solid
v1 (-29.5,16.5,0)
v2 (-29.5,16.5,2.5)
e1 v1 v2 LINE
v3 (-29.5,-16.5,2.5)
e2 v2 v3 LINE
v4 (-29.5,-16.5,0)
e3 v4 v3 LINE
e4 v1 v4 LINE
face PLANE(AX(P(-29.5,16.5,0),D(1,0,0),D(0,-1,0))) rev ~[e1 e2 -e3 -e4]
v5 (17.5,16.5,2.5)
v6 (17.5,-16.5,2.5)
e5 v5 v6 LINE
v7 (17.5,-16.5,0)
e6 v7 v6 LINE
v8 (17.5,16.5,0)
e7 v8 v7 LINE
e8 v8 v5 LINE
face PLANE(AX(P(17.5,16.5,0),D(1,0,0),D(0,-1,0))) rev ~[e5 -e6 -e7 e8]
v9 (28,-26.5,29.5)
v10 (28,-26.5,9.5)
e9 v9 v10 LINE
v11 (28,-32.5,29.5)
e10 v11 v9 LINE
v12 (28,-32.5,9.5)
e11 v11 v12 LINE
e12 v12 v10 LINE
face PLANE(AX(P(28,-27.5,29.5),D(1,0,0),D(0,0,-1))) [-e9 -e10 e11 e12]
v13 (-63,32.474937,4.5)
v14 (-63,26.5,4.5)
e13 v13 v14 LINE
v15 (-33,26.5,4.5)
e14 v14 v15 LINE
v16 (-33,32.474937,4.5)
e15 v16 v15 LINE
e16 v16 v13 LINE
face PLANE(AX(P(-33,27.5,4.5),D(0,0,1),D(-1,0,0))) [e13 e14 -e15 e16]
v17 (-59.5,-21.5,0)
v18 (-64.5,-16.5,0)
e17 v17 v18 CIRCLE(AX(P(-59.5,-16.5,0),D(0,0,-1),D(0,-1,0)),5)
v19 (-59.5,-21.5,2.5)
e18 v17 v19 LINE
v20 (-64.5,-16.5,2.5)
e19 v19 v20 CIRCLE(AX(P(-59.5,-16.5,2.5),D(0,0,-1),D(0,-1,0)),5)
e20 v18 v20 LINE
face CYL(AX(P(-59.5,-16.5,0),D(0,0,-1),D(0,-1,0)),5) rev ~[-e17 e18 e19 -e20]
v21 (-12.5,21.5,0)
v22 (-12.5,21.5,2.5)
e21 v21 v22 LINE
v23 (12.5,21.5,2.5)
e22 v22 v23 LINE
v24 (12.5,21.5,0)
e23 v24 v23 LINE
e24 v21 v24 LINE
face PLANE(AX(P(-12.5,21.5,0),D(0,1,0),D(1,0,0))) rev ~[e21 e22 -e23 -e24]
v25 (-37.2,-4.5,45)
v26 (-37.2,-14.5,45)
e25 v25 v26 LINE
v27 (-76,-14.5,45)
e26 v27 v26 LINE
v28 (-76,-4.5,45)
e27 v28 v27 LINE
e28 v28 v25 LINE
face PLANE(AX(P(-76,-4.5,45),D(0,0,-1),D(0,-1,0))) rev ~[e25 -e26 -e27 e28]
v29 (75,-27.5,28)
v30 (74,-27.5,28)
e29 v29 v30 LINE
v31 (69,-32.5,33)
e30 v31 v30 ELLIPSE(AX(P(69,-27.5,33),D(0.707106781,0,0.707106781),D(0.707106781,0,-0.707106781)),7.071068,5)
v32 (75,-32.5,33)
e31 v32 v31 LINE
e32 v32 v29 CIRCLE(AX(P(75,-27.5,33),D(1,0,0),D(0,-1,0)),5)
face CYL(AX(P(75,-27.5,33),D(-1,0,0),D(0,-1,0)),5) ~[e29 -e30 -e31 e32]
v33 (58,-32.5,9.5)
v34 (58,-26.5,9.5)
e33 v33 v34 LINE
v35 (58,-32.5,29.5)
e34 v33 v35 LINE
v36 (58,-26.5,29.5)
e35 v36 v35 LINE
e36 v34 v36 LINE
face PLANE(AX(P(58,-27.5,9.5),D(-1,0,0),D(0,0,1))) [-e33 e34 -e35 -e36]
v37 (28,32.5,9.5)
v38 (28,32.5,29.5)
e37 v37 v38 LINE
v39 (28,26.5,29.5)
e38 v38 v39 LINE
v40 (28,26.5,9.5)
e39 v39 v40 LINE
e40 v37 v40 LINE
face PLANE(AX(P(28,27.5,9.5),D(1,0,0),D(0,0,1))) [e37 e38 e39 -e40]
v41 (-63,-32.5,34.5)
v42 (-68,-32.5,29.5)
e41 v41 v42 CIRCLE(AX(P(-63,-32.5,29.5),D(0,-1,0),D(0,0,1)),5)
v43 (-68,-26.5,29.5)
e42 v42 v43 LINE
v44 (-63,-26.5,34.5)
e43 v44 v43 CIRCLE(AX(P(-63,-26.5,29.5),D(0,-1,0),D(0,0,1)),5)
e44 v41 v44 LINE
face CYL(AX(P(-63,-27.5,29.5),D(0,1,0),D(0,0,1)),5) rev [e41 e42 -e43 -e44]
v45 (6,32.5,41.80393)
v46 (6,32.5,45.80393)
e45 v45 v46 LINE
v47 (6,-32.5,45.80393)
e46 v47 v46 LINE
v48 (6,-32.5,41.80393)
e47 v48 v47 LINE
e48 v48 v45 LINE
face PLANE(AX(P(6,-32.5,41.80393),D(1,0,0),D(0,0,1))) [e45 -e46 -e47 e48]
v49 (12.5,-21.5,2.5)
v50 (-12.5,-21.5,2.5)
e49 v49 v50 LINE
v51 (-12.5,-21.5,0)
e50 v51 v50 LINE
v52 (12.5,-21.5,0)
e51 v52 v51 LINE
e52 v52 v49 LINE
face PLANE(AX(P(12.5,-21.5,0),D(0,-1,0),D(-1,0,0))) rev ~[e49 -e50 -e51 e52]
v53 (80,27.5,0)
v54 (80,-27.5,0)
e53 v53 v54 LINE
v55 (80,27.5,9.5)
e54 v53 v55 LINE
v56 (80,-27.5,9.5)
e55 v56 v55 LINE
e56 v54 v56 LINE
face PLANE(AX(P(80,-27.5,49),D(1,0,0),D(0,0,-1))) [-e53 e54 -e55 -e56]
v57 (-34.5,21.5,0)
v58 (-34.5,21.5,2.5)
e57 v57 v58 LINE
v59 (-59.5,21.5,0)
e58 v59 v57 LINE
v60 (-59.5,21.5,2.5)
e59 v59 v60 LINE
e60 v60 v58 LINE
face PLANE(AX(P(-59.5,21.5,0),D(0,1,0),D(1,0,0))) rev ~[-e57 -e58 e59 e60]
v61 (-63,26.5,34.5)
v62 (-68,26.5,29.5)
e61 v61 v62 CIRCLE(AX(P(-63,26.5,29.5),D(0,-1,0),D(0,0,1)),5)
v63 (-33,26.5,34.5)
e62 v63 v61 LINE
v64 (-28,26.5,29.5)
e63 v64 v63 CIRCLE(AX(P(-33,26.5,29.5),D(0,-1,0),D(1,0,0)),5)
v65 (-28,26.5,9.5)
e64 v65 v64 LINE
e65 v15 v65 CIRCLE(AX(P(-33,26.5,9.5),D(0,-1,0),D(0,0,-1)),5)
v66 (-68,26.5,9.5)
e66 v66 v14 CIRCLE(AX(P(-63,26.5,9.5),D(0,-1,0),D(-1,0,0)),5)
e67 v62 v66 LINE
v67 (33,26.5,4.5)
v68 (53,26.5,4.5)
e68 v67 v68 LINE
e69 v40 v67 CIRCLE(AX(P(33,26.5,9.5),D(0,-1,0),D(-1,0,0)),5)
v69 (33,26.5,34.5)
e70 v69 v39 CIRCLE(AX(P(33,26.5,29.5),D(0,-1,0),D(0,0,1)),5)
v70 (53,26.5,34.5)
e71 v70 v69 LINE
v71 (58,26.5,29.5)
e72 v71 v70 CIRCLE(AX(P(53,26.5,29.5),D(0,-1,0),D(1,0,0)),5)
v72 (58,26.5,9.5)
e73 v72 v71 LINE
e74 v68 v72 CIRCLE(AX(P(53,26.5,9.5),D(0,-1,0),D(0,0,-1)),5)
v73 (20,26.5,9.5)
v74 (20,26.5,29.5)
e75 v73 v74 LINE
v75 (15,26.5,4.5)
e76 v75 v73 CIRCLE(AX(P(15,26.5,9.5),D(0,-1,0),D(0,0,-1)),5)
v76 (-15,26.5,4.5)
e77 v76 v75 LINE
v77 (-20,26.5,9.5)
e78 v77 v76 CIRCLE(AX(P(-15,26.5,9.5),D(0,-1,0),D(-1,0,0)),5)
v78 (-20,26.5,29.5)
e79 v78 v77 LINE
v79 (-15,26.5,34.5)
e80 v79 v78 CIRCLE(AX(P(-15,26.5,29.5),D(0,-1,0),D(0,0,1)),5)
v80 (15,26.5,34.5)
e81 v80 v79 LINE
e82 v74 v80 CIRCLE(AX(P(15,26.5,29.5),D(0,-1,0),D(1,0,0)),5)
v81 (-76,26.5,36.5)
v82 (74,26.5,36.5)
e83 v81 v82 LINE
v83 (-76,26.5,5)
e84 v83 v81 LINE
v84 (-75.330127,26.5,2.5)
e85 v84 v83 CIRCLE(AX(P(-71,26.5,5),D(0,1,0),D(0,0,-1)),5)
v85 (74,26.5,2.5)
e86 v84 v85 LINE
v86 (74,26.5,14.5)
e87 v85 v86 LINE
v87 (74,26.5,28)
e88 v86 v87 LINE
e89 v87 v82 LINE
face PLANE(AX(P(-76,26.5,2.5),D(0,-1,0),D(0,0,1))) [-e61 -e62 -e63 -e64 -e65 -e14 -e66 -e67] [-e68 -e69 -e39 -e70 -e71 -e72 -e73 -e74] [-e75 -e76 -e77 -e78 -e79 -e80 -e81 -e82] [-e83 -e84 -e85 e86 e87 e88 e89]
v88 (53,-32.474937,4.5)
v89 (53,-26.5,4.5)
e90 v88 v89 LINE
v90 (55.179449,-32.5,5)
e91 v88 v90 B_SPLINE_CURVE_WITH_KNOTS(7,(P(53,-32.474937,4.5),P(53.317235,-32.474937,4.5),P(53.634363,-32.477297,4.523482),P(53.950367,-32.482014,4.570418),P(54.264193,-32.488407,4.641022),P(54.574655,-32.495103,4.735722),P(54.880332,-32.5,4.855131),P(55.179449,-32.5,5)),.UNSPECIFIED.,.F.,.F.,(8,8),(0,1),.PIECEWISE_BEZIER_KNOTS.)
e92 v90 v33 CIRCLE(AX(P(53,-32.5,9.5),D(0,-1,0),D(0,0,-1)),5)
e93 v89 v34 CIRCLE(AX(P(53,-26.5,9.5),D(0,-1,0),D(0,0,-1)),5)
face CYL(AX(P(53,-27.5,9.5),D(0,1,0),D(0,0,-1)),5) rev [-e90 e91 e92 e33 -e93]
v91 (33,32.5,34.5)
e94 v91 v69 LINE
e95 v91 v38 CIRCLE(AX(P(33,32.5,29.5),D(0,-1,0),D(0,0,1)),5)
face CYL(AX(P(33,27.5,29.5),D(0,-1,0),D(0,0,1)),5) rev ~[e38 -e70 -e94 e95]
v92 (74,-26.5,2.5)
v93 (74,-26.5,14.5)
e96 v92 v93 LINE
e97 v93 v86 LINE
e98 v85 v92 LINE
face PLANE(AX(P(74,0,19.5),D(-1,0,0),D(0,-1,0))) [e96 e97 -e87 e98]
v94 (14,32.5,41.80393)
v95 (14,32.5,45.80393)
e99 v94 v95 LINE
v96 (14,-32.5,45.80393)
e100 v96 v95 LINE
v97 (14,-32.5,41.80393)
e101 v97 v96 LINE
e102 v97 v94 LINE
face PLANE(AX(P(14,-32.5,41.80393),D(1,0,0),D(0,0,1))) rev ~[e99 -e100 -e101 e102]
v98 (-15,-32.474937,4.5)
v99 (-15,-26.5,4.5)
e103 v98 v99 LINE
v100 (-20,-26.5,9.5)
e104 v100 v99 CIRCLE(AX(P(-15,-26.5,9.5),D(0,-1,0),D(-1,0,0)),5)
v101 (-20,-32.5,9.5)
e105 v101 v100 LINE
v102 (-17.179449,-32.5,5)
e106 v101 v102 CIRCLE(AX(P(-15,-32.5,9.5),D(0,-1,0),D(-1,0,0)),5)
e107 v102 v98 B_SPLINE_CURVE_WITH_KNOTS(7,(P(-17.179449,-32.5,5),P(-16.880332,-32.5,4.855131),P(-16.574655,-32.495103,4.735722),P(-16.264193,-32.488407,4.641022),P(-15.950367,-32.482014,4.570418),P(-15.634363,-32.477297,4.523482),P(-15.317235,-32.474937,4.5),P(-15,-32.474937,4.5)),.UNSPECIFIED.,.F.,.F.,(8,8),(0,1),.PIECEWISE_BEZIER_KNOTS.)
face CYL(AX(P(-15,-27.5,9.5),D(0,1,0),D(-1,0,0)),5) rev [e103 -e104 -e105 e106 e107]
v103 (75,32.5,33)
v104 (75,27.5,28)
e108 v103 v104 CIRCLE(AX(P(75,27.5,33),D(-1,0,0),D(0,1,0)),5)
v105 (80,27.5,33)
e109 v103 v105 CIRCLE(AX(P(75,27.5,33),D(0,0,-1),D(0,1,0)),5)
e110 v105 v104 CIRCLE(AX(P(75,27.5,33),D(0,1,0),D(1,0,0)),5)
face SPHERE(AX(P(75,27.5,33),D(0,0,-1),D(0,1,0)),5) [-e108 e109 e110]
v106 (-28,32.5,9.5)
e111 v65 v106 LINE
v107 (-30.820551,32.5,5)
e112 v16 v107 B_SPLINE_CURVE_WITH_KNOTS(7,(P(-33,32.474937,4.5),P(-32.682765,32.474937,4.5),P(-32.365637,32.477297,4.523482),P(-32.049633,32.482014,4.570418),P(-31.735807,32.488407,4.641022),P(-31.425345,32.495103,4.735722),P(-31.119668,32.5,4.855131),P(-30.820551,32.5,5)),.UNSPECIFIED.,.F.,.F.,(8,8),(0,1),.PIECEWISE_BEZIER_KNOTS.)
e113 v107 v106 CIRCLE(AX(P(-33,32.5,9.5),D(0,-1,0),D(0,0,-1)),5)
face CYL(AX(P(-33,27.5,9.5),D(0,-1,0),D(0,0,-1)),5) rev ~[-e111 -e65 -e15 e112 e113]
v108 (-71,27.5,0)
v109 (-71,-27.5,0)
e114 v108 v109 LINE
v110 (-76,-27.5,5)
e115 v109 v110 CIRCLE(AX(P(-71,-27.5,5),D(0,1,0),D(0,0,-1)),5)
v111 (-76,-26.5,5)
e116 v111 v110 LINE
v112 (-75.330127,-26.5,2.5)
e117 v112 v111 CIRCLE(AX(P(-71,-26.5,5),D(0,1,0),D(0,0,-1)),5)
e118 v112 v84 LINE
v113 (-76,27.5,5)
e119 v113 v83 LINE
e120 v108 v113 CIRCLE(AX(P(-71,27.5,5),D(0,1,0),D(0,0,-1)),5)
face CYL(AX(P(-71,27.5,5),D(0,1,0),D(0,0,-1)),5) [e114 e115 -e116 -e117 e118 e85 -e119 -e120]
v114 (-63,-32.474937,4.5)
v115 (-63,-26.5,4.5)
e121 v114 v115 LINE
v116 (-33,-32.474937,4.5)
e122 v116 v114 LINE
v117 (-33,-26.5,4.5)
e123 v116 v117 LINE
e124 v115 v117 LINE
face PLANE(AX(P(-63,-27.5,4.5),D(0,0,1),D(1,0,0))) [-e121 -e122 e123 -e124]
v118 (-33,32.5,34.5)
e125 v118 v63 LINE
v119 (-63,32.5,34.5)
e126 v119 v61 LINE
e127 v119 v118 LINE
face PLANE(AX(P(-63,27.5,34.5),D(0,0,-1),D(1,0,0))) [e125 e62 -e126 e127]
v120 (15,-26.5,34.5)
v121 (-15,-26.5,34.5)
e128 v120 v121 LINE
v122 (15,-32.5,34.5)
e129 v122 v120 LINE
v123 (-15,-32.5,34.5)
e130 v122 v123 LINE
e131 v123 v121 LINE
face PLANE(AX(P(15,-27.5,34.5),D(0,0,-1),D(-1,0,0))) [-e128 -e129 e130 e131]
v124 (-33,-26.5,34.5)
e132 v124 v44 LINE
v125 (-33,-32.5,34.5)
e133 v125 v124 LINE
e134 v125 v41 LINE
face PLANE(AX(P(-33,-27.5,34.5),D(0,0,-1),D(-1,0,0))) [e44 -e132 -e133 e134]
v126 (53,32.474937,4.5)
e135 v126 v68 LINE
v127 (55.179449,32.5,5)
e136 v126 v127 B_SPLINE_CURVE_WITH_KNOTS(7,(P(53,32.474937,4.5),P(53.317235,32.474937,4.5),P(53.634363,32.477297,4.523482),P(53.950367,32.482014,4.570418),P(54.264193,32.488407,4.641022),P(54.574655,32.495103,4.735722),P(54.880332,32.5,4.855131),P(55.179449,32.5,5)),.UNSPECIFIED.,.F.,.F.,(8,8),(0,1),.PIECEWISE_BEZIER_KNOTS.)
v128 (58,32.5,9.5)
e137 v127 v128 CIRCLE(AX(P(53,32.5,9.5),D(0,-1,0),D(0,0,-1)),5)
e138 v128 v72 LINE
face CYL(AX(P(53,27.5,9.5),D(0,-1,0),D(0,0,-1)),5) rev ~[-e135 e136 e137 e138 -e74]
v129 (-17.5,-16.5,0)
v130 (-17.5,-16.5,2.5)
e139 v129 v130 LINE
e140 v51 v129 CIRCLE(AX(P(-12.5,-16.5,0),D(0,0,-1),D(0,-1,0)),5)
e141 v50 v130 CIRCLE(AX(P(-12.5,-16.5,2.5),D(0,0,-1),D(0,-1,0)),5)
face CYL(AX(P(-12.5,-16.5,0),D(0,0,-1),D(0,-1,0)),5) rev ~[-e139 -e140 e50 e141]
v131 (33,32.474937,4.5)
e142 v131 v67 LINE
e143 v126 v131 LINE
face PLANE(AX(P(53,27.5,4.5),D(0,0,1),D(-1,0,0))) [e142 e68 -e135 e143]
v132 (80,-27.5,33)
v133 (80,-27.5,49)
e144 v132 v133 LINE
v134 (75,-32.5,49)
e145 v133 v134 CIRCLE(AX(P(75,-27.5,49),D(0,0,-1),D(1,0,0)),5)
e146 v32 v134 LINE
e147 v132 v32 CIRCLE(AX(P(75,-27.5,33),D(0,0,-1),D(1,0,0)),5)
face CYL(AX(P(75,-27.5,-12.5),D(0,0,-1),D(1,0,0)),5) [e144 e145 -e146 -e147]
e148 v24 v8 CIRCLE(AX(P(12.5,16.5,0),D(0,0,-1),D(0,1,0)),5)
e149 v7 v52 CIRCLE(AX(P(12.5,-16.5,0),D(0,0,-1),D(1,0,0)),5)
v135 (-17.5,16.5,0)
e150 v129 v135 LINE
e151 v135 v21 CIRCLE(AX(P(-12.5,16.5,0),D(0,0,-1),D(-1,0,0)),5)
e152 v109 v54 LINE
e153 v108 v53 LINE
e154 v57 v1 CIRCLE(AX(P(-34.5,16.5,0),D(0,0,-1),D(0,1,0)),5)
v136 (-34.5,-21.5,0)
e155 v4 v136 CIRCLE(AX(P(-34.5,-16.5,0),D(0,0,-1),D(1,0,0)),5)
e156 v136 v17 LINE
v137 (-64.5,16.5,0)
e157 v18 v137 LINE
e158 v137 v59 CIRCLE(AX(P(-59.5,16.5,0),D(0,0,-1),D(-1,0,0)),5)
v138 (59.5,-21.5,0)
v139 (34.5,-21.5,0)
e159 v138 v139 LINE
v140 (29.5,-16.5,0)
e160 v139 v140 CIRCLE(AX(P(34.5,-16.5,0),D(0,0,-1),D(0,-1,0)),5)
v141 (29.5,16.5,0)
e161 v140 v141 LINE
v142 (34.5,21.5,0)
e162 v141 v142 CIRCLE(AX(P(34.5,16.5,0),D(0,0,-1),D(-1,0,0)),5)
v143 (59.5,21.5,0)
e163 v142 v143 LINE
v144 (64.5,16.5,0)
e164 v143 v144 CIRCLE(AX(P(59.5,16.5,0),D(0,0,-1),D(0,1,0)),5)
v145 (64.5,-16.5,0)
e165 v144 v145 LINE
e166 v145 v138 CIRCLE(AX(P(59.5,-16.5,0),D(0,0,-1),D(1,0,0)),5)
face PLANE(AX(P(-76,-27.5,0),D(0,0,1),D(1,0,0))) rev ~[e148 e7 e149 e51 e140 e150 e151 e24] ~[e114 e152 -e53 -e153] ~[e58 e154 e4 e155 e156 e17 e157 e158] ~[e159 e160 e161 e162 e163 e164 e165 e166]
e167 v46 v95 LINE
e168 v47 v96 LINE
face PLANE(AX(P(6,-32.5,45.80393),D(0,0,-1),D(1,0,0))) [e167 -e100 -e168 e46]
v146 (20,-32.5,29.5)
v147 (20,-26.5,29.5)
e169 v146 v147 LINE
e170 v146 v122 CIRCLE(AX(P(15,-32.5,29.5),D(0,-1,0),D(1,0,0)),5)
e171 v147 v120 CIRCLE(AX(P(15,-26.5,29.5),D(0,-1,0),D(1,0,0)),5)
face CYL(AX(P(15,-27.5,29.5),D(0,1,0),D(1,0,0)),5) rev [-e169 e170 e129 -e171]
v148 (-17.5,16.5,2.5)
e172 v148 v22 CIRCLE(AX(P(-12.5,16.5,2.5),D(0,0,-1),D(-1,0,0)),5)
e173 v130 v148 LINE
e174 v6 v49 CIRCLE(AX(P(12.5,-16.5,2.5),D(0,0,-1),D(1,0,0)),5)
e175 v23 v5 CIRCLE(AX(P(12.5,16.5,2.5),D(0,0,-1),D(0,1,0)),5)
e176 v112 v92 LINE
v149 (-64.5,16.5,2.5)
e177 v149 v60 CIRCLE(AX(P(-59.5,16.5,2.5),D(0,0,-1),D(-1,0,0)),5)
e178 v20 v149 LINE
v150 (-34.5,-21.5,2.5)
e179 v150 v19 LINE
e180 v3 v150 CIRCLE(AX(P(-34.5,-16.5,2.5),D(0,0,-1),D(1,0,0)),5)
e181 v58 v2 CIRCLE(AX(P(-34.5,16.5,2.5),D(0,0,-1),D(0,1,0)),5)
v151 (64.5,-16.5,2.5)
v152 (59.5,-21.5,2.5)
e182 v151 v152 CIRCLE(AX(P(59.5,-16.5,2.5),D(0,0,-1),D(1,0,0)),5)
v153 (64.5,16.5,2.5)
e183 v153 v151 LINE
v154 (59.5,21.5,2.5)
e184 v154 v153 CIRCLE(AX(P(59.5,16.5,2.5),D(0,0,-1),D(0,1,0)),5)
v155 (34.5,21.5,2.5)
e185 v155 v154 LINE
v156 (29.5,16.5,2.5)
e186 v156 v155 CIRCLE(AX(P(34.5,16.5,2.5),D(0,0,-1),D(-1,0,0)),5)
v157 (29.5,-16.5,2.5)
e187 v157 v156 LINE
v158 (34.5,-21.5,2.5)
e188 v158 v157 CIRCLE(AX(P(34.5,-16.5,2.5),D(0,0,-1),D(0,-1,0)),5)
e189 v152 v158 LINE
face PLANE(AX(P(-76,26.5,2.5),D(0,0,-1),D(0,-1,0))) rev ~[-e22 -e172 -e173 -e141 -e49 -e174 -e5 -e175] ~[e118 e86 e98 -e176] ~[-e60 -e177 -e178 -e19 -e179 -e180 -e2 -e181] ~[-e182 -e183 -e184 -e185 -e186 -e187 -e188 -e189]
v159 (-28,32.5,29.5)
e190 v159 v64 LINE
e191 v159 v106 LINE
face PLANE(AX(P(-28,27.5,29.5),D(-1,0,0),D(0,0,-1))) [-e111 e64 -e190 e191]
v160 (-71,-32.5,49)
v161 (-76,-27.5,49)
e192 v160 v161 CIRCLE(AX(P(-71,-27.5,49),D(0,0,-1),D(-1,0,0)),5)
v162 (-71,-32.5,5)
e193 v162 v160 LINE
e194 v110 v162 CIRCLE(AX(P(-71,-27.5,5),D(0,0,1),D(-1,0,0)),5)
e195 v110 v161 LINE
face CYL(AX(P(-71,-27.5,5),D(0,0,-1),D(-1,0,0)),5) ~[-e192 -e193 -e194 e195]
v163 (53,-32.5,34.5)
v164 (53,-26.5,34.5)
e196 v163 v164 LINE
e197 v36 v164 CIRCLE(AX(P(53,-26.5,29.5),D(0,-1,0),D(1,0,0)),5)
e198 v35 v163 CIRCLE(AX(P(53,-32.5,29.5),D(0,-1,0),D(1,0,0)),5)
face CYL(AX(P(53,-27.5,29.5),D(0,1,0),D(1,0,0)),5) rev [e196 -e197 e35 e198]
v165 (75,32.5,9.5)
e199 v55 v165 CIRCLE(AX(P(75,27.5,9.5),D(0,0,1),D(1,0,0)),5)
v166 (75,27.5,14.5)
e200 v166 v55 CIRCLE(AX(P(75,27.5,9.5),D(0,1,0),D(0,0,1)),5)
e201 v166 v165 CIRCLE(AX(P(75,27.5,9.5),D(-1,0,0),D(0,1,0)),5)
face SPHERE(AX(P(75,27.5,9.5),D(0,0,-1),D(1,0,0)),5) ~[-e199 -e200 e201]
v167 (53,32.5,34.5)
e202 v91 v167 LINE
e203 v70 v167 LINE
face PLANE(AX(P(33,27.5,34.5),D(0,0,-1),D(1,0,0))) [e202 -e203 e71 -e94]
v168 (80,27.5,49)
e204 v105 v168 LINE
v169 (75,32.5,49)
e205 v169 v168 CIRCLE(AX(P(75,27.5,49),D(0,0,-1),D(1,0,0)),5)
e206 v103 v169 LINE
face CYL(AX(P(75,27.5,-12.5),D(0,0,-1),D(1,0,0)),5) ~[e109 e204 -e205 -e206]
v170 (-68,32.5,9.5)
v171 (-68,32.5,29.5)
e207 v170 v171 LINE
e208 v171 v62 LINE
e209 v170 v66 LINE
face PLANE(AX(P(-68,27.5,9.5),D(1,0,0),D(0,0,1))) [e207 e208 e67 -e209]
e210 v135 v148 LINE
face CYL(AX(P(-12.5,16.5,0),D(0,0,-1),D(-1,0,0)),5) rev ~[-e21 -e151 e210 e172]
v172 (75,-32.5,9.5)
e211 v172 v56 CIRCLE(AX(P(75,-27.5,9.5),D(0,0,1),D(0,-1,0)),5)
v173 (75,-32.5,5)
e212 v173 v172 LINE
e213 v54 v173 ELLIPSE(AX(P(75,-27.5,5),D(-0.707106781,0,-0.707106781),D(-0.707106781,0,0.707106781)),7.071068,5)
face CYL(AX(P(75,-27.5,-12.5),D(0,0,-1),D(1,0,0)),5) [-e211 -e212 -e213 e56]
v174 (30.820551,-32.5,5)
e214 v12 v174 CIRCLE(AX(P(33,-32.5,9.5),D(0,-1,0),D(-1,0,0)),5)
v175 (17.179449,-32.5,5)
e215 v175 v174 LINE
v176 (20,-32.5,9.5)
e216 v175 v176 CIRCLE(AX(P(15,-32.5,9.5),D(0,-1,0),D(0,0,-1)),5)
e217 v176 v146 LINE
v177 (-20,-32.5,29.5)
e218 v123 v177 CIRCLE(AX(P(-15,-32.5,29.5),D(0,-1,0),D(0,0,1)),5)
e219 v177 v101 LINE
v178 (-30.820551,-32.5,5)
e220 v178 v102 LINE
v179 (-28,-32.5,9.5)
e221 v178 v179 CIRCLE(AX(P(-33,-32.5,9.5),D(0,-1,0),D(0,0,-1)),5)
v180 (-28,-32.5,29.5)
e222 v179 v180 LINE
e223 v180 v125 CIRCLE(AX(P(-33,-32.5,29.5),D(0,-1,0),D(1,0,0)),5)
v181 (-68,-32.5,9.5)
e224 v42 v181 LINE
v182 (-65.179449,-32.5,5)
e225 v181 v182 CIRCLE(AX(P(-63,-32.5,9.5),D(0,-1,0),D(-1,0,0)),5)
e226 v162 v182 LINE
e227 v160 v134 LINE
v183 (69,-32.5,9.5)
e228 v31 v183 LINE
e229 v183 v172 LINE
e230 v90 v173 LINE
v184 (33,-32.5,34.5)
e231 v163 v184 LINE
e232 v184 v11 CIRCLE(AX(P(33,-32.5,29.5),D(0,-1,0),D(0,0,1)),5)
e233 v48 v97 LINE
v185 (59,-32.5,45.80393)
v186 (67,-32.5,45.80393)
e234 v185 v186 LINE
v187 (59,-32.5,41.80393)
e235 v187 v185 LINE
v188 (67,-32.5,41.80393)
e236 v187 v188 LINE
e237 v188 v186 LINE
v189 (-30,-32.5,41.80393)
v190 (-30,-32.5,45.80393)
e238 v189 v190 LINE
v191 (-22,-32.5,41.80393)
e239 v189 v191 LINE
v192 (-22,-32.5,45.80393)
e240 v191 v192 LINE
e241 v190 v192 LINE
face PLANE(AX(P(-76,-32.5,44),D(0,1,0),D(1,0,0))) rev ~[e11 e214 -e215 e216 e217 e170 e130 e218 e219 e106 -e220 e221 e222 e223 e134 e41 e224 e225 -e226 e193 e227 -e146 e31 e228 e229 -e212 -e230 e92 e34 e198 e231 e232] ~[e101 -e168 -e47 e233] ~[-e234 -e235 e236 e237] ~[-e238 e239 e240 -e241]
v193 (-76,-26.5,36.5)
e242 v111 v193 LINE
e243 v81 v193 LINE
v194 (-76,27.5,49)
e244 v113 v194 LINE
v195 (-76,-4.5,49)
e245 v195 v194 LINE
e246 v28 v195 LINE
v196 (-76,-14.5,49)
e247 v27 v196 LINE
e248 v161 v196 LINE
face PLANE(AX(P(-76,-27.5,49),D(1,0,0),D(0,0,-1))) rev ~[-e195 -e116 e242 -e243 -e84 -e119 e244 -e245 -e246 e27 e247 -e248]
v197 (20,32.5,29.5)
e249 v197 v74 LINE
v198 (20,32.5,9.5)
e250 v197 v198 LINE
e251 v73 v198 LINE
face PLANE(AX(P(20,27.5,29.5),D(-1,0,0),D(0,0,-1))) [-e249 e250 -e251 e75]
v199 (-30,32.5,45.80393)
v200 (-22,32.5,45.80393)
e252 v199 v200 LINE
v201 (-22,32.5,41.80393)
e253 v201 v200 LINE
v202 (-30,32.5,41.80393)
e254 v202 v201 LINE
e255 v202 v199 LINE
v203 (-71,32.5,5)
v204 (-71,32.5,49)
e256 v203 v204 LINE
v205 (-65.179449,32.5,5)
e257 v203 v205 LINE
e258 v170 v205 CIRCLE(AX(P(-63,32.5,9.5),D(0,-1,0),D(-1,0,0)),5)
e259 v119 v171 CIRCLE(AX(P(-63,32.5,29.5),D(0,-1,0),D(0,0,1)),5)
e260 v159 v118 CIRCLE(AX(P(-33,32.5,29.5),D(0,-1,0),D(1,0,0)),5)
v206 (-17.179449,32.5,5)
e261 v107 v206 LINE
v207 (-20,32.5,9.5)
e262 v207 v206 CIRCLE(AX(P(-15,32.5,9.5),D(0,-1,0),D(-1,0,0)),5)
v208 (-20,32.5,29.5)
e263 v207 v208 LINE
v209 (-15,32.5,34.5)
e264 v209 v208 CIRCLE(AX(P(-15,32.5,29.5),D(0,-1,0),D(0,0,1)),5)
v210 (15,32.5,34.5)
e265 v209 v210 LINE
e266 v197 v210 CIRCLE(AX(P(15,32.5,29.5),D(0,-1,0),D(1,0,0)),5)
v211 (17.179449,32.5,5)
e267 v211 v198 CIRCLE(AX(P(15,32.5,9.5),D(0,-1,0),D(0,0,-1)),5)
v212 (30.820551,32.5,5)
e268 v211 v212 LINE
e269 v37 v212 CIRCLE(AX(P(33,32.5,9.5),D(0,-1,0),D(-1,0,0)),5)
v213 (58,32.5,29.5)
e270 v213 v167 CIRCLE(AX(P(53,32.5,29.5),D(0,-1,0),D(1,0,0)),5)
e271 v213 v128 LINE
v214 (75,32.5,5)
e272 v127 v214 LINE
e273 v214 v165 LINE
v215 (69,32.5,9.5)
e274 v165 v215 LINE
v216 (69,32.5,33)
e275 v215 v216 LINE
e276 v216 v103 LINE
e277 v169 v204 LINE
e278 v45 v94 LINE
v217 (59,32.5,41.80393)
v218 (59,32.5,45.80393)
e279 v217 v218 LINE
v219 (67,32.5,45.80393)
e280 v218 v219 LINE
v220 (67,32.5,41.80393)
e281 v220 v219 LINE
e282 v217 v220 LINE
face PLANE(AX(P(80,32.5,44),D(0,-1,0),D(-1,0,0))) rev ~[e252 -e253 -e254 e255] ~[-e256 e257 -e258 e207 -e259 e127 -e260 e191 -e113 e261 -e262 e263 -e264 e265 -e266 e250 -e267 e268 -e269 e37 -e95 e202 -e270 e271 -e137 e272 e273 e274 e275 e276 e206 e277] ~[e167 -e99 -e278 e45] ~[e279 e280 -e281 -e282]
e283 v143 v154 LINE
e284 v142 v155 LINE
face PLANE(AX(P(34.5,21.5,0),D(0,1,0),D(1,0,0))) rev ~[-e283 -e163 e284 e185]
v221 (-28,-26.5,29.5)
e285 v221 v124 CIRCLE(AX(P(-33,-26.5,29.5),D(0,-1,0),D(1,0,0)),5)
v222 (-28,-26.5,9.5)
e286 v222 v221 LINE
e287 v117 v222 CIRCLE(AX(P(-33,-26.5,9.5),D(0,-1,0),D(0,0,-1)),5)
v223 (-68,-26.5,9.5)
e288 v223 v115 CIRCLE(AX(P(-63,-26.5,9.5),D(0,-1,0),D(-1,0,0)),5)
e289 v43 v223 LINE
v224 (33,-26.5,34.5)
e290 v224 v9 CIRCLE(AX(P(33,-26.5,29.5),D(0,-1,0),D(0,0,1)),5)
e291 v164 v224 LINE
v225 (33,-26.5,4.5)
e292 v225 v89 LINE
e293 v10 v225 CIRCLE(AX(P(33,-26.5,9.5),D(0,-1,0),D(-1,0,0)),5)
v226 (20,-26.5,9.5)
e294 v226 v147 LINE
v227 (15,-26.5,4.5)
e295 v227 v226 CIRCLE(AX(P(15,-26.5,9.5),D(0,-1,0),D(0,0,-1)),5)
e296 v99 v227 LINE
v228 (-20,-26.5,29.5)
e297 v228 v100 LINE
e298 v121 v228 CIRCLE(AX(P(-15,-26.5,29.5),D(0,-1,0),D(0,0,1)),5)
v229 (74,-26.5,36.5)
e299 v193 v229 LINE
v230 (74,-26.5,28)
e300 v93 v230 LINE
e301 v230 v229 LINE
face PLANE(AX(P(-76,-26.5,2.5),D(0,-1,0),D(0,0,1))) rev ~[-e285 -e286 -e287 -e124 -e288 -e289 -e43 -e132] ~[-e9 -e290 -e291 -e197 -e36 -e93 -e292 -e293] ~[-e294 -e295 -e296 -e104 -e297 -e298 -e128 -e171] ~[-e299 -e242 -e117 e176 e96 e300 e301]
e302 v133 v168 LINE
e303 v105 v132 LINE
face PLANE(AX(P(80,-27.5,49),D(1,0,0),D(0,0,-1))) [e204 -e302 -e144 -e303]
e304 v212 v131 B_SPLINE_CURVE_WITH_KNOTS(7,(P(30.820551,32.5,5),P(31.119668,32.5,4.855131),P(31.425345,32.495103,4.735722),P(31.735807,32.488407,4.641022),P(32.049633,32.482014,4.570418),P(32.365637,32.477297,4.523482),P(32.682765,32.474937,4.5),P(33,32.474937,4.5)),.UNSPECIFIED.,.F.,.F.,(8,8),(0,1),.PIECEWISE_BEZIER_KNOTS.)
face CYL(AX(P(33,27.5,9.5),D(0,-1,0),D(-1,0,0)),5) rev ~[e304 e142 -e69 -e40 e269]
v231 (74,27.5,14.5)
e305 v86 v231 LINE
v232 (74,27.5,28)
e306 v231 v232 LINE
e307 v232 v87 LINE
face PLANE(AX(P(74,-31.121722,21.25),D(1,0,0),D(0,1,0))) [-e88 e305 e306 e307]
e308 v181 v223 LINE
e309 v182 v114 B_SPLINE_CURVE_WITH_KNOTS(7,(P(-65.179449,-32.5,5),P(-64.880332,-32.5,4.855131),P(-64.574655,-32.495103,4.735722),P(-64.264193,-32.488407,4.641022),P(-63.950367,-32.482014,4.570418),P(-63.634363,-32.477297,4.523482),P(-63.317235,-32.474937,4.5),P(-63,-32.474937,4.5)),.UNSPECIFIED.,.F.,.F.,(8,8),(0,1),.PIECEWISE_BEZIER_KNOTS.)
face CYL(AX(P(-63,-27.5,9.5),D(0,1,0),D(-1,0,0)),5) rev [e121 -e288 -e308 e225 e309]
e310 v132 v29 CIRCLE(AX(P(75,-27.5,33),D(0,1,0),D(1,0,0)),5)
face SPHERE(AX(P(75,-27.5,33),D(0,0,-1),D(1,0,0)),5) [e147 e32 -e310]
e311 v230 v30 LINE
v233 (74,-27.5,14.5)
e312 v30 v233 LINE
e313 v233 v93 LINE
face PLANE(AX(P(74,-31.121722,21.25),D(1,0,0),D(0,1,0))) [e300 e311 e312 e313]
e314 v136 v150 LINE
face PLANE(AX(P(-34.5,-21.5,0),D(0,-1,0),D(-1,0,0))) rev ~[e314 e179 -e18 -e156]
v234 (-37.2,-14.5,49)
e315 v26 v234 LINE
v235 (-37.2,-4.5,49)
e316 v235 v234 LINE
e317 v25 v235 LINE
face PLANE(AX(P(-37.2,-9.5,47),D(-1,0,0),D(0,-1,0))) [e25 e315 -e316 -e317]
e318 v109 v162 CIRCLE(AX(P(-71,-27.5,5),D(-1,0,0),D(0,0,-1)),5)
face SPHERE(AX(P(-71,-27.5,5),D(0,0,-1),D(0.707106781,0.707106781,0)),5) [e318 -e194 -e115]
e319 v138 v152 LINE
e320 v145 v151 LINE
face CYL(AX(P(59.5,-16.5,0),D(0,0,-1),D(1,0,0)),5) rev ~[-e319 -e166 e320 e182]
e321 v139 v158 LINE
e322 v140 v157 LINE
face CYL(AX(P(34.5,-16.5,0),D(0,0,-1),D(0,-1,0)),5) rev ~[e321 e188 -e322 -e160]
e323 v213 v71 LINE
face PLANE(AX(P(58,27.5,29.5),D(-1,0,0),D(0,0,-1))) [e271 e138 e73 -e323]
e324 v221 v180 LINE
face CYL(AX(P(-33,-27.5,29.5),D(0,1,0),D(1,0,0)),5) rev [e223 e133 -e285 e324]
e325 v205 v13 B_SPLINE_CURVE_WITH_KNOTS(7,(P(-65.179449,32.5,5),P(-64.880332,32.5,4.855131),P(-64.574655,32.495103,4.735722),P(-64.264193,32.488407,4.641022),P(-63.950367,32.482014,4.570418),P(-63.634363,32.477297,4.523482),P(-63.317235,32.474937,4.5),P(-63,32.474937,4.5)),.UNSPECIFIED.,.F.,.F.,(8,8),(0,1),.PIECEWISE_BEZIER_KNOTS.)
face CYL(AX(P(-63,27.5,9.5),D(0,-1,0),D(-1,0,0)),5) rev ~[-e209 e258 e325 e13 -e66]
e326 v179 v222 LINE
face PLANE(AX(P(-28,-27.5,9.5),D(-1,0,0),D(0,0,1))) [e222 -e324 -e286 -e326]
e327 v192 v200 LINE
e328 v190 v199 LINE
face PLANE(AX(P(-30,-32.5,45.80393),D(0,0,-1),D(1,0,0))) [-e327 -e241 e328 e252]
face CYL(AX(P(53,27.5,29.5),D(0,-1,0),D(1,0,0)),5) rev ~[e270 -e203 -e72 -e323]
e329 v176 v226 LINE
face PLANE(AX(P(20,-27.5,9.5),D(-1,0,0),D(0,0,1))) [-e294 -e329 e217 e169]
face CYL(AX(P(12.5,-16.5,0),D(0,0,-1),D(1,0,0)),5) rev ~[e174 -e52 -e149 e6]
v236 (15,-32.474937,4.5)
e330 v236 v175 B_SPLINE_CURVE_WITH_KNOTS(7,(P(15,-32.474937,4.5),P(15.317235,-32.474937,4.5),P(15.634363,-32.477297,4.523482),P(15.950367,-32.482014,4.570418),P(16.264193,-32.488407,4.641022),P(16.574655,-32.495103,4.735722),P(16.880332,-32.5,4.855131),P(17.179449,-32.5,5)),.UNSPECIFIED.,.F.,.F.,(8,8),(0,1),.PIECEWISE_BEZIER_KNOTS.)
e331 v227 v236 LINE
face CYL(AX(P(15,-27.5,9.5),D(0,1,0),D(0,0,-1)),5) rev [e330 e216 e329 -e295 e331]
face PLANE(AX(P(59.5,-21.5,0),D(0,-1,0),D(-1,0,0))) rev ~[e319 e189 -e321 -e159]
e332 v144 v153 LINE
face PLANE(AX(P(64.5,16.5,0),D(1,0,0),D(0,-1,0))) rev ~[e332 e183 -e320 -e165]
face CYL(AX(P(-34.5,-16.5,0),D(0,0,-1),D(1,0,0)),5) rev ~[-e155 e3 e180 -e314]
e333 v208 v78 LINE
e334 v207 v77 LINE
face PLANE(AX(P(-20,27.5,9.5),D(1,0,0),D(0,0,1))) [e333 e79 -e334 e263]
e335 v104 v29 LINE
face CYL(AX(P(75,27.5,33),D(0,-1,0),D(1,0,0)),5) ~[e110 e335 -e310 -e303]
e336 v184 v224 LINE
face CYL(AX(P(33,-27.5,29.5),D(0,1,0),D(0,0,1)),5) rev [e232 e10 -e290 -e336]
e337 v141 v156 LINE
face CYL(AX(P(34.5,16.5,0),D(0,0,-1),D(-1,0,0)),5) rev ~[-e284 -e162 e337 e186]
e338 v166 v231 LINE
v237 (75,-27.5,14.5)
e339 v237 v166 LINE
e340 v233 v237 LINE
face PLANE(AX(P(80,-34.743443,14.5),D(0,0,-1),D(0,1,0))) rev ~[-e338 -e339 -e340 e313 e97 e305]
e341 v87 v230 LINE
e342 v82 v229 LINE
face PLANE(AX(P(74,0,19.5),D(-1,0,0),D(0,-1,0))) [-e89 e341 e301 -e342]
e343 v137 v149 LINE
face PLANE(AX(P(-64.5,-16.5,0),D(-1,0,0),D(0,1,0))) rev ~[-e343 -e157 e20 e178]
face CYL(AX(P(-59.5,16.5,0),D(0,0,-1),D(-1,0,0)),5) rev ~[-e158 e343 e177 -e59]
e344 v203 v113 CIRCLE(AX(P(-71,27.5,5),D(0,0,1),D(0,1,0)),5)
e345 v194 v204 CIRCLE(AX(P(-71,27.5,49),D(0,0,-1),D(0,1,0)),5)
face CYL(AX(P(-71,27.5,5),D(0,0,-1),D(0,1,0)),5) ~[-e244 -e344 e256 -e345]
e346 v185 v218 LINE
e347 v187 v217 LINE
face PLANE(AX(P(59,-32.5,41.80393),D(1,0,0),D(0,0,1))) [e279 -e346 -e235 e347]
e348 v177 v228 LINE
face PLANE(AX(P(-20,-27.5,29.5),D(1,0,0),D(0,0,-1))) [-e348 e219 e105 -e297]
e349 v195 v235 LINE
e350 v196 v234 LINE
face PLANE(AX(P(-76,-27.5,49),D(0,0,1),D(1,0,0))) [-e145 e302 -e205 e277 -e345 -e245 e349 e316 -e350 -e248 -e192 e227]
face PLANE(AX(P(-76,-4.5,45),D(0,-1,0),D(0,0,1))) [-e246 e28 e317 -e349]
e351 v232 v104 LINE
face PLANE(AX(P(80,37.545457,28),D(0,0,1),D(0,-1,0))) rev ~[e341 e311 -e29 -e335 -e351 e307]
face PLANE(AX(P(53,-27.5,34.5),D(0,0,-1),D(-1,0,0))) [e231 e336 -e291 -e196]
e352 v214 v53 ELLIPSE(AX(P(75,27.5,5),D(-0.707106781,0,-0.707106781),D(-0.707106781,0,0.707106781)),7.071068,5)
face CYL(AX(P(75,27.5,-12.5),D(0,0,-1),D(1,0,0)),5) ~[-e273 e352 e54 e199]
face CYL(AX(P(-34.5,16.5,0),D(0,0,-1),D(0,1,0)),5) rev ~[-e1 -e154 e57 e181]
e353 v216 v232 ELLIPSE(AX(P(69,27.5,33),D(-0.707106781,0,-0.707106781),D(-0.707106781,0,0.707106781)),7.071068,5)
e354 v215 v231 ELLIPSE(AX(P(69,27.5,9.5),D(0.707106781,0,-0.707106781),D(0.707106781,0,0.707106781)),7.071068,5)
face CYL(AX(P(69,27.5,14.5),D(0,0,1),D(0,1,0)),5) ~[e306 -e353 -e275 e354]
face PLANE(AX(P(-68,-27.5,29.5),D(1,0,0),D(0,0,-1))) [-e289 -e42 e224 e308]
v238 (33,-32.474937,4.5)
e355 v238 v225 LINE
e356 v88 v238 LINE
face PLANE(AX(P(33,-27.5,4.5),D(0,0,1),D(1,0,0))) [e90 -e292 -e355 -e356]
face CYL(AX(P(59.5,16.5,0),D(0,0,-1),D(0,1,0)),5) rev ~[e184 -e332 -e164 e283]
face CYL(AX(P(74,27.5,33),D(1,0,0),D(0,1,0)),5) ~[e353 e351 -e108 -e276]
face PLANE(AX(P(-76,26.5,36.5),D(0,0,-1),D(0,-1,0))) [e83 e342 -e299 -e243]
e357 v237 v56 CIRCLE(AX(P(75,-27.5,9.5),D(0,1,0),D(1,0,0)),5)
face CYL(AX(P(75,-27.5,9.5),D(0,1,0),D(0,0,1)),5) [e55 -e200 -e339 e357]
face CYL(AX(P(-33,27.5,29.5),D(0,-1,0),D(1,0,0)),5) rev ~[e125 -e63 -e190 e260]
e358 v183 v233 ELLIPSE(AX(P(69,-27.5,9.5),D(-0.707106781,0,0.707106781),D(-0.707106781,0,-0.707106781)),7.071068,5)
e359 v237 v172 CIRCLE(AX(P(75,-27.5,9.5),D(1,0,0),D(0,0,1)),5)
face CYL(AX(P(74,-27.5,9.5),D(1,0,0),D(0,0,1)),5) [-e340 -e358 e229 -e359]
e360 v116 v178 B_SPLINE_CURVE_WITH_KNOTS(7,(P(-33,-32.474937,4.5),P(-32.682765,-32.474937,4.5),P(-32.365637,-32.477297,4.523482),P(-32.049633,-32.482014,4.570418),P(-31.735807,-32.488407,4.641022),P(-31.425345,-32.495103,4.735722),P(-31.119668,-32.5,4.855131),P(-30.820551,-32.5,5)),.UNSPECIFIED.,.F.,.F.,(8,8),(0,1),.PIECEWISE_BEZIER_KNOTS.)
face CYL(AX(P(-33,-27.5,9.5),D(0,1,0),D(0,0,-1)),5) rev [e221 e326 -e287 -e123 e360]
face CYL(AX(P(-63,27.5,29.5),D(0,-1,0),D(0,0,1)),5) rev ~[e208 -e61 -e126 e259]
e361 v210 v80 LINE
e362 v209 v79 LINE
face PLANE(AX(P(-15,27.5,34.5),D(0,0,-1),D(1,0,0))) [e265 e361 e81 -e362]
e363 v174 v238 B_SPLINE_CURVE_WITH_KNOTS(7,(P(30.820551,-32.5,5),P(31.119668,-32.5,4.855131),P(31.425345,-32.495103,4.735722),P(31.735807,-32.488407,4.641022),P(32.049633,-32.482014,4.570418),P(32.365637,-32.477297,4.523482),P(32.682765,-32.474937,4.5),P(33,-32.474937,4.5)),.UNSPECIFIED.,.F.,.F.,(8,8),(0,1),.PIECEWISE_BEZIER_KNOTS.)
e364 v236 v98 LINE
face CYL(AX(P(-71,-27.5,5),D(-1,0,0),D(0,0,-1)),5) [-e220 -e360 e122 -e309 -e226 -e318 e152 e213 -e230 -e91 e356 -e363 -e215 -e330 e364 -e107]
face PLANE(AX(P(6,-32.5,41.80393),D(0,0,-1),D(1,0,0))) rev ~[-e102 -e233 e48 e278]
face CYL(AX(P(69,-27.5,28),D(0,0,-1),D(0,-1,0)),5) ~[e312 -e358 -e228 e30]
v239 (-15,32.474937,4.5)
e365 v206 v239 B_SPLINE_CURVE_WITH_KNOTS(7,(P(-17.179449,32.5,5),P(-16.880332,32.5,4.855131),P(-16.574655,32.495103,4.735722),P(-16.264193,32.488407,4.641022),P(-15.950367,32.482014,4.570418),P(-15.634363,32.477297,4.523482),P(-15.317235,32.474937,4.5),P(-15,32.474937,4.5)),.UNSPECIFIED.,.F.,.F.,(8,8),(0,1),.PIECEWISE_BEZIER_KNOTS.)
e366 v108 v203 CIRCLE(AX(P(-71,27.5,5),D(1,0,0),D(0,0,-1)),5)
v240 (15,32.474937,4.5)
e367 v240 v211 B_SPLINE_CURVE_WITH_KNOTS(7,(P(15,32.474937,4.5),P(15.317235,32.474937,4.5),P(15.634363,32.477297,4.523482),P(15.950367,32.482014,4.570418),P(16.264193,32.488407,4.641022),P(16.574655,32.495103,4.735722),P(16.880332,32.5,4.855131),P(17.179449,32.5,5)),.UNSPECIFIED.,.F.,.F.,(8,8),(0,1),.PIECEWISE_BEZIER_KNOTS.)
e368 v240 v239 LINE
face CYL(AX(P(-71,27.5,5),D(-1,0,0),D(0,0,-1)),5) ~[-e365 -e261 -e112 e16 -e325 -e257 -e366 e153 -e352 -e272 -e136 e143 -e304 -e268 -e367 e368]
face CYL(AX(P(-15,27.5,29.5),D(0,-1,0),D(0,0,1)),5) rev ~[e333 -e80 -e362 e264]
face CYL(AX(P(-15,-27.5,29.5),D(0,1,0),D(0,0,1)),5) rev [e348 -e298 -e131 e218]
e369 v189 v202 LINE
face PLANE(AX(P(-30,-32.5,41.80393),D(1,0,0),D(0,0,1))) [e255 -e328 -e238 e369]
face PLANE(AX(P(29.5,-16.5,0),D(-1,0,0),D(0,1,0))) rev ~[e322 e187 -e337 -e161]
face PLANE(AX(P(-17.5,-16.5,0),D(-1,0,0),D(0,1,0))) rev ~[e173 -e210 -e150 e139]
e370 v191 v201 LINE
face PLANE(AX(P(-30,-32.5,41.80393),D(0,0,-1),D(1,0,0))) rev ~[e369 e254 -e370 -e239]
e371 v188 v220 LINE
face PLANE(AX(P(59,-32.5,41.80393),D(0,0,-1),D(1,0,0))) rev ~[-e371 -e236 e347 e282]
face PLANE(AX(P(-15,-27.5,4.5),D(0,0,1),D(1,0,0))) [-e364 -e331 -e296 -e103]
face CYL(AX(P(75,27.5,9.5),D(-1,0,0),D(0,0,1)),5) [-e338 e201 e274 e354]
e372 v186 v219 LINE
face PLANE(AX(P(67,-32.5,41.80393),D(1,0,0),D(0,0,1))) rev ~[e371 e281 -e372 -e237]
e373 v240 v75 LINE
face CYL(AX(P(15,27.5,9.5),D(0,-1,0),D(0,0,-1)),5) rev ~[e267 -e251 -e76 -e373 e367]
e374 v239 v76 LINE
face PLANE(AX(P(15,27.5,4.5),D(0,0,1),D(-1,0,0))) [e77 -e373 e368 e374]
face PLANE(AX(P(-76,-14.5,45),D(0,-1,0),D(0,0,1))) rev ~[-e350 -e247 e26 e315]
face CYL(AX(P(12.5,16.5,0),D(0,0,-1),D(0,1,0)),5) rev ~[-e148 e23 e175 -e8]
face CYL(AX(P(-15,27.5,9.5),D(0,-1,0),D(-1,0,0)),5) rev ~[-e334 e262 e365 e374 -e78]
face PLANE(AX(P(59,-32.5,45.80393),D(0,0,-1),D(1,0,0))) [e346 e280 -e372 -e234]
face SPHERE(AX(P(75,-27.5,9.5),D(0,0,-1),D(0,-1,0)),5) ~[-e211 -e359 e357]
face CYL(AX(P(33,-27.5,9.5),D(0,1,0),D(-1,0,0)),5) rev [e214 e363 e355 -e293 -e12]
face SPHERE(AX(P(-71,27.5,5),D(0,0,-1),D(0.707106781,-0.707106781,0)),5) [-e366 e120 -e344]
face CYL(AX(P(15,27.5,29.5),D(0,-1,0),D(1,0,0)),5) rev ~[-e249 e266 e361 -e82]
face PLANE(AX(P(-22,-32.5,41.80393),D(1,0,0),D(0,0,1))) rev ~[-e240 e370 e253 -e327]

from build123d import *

# Parameters (mm, degrees)
F0_W          = 152
F0_H          = 55
F1_DEPTH      = 39
F2_W          = 53
F2_H          = 34
F3_DEPTH      = 150
F5_DEPTH      = 10.9
F7_DEPTH      = 100
F8_DEPTH      = 5
F9_DEPTH      = 4
F10_DEPTH     = 5
F11_DEPTH     = 5
F12_DEPTH     = 5
F13_W         = 8
F13_H         = 4
F14_DEPTH     = 100
F15_T1_DEPTH  = 163.5
F15_T3_DEPTH  = 74
F15_T5_DEPTH  = 56.5
F15_T7_DEPTH  = 55
F15_S11_W     = 5
F15_S11_H     = 5
F15_T12_DEPTH = 5
F15_S17_W     = 5
F15_S17_H     = 5
F15_T18_DEPTH = 5
F16_W         = 7.2434431314
F16_H         = 13.5
F16_W_2       = 55
F16_W_3       = 10.0454574823
F17_DEPTH     = 6
F18_R         = 5
F19_W         = 10
F19_H         = 4
F20_DEPTH     = 38.8


# Not quite as in the source:
# - a fillet or chamfer that OpenCascade refuses, or shapes differently, is made with other operations: its cross-section is extruded or revolved along the edge and cut away or added


with BuildPart() as f1:
    # F0 (on Top) → F1 (new body)
    with BuildSketch(Plane.XY):
        Rectangle(F0_W, F0_H)
    extrude(amount=F1_DEPTH)

    # F2 (on face) → F3 (cut)
    with BuildSketch(Plane(origin=(-76, 0, 0), x_dir=(0, -1, 0), z_dir=(-1, 0, 0))):
        with Locations((0, 19.5)):
            Rectangle(F2_W, F2_H)
    extrude(amount=-F3_DEPTH, mode=Mode.SUBTRACT)

    # F4 (on face) → F5 (cut)
    with BuildSketch(Plane(origin=(0, 0, 0), x_dir=(1, 0, 0), z_dir=(0, 0, -1))):
        with BuildLine():
            ThreePointArc((-29.5, 16.5), (-30.9644660941, 20.0355339059), (-34.5, 21.5))
            Line((-34.5, 21.5), (-59.5, 21.5))
            ThreePointArc((-59.5, 21.5), (-63.0355339059, 20.0355339059), (-64.5, 16.5))
            Line((-64.5, 16.5), (-64.5, -16.5))
            ThreePointArc((-64.5, -16.5), (-63.0355339059, -20.0355339059), (-59.5, -21.5))
            Line((-59.5, -21.5), (-34.5, -21.5))
            ThreePointArc((-34.5, -21.5), (-30.9644660941, -20.0355339059), (-29.5, -16.5))
            Line((-29.5, -16.5), (-29.5, 16.5))
        make_face()
        with BuildLine():
            Line((-12.5, -21.5), (12.5, -21.5))
            ThreePointArc((12.5, -21.5), (16.0355339059, -20.0355339059), (17.5, -16.5))
            Line((17.5, -16.5), (17.5, 16.5))
            ThreePointArc((17.5, 16.5), (16.0355339059, 20.0355339059), (12.5, 21.5))
            Line((12.5, 21.5), (-12.5, 21.5))
            ThreePointArc((-12.5, 21.5), (-16.0355339059, 20.0355339059), (-17.5, 16.5))
            Line((-17.5, 16.5), (-17.5, -16.5))
            ThreePointArc((-17.5, -16.5), (-16.0355339059, -20.0355339059), (-12.5, -21.5))
        make_face()
        with BuildLine():
            ThreePointArc((64.5, 16.5), (63.0355339059, 20.0355339059), (59.5, 21.5))
            Line((59.5, 21.5), (34.5, 21.5))
            ThreePointArc((34.5, 21.5), (30.9644660941, 20.0355339059), (29.5, 16.5))
            Line((29.5, 16.5), (29.5, -16.5))
            ThreePointArc((29.5, -16.5), (30.9644660941, -20.0355339059), (34.5, -21.5))
            Line((34.5, -21.5), (59.5, -21.5))
            ThreePointArc((59.5, -21.5), (63.0355339059, -20.0355339059), (64.5, -16.5))
            Line((64.5, -16.5), (64.5, 16.5))
        make_face()
    extrude(amount=-F5_DEPTH, mode=Mode.SUBTRACT)

    # F6 (on face) → F7 (cut)
    with BuildSketch(Plane.XZ.offset(27.5)):
        with BuildLine():
            ThreePointArc((-28, 29.5), (-29.4644660941, 33.0355339059), (-33, 34.5))
            Line((-33, 34.5), (-63, 34.5))
            ThreePointArc((-63, 34.5), (-66.5355339059, 33.0355339059), (-68, 29.5))
            Line((-68, 29.5), (-68, 9.5))
            ThreePointArc((-68, 9.5), (-66.5355339059, 5.9644660941), (-63, 4.5))
            Line((-63, 4.5), (-33, 4.5))
            ThreePointArc((-33, 4.5), (-29.4644660941, 5.9644660941), (-28, 9.5))
            Line((-28, 9.5), (-28, 29.5))
        make_face()
        with BuildLine():
            ThreePointArc((20, 29.5), (18.5355339059, 33.0355339059), (15, 34.5))
            Line((15, 34.5), (-15, 34.5))
            ThreePointArc((-15, 34.5), (-18.5355339059, 33.0355339059), (-20, 29.5))
            Line((-20, 29.5), (-20, 9.5))
            ThreePointArc((-20, 9.5), (-18.5355339059, 5.9644660941), (-15, 4.5))
            Line((-15, 4.5), (15, 4.5))
            ThreePointArc((15, 4.5), (18.5355339059, 5.9644660941), (20, 9.5))
            Line((20, 9.5), (20, 29.5))
        make_face()
        with BuildLine():
            ThreePointArc((58, 29.5), (56.5355339059, 33.0355339059), (53, 34.5))
            Line((53, 34.5), (33, 34.5))
            ThreePointArc((33, 34.5), (29.4644660941, 33.0355339059), (28, 29.5))
            Line((28, 29.5), (28, 9.5))
            ThreePointArc((28, 9.5), (29.4644660941, 5.9644660941), (33, 4.5))
            Line((33, 4.5), (53, 4.5))
            ThreePointArc((53, 4.5), (56.5355339059, 5.9644660941), (58, 9.5))
            Line((58, 9.5), (58, 29.5))
        make_face()
    extrude(amount=-F7_DEPTH, mode=Mode.SUBTRACT)

    # F8 (add): a face of the model
    f8_faces = [f1.faces().sort_by_distance(p)[0] for p in [
        (0, 0, 39),
    ]]
    extrude(f8_faces, amount=F8_DEPTH)

    # F9 (add): a face of the model
    f9_faces = [f1.faces().sort_by_distance(p)[0] for p in [
        (76, 0, 22),
    ]]
    extrude(f9_faces, amount=F9_DEPTH)

    # F10 (add): a face of the model
    f10_faces = [f1.faces().sort_by_distance(p)[0] for p in [
        (2, 0, 44),
    ]]
    extrude(f10_faces, amount=F10_DEPTH)

    # F11 (add): a face of the model
    f11_faces = [f1.faces().sort_by_distance(p)[0] for p in [
        (-74.3648547465, 27.5, 24.5),
    ]]
    extrude(f11_faces, amount=F11_DEPTH)

    # F12 (add): a face of the model
    f12_faces = [f1.faces().sort_by_distance(p)[0] for p in [
        (-74.3648547465, -27.5, 24.5),
    ]]
    extrude(f12_faces, amount=F12_DEPTH)

    # F13 (on face) → F14 (cut)
    with BuildSketch(Plane.XZ.offset(32.5)):
        with Locations((-26, 43.8039299548)):
            Rectangle(F13_W, F13_H)
        with Locations((10, 43.8039299548)):
            Rectangle(F13_W, F13_H)
        with Locations((63, 43.8039299548)):
            Rectangle(F13_W, F13_H)
    extrude(amount=-F14_DEPTH, mode=Mode.SUBTRACT)

    # F15: fillet of radius 5 on 7 edges, made by hand

    # F15_s2 → F15_t1 (cut)
    with BuildSketch(Plane.YZ.offset(-71)):
        with BuildLine():
            ThreePointArc((-27.5, 0), (-31.0355339059, 1.4644660941), (-32.5, 5))
            Line((-32.5, 5), (-32.5, 0))
            Line((-32.5, 0), (-27.5, 0))
        make_face()
        with BuildLine():
            ThreePointArc((27.5, 0), (31.0355339059, 1.4644660941), (32.5, 5))
            Line((32.5, 5), (32.5, 0))
            Line((32.5, 0), (27.5, 0))
        make_face()
    extrude(amount=F15_T1_DEPTH, mode=Mode.SUBTRACT)

    # F15_s4 → F15_t3 (cut)
    with BuildSketch(Plane.XY.offset(-12.5)):
        with BuildLine():
            ThreePointArc((80, 27.5), (78.5355339059, 31.0355339059), (75, 32.5))
            Line((75, 32.5), (80, 32.5))
            Line((80, 32.5), (80, 27.5))
        make_face()
        with BuildLine():
            ThreePointArc((80, -27.5), (78.5355339059, -31.0355339059), (75, -32.5))
            Line((75, -32.5), (80, -32.5))
            Line((80, -32.5), (80, -27.5))
        make_face()
    extrude(amount=F15_T3_DEPTH, mode=Mode.SUBTRACT)

    # F15_s6 → F15_t5 (cut)
    with BuildSketch(Plane.XY.offset(5)):
        with BuildLine():
            ThreePointArc((-76, -27.5), (-74.5355339059, -31.0355339059), (-71, -32.5))
            Line((-71, -32.5), (-76, -32.5))
            Line((-76, -32.5), (-76, -27.5))
        make_face()
        with BuildLine():
            ThreePointArc((-71, 32.5), (-74.5355339059, 31.0355339059), (-76, 27.5))
            Line((-76, 27.5), (-76, 32.5))
            Line((-76, 32.5), (-71, 32.5))
        make_face()
    extrude(amount=F15_T5_DEPTH, mode=Mode.SUBTRACT)

    # F15_s8 → F15_t7 (cut)
    with BuildSketch(Plane.XZ.offset(-27.5)):
        with BuildLine():
            ThreePointArc((-71, 0), (-74.5355339059, 1.4644660941), (-76, 5))
            Line((-76, 5), (-76, 0))
            Line((-76, 0), (-71, 0))
        make_face()
    extrude(amount=F15_T7_DEPTH, mode=Mode.SUBTRACT)


with BuildPart() as f15_tool10:
    # F15_s11 → F15_t12 (new body)
    with BuildSketch(Plane.XY.offset(5)):
        with Locations((-73.5, -30)):
            Rectangle(F15_S11_W, F15_S11_H)
    extrude(amount=-F15_T12_DEPTH)

    # F15_s13 → F15_t14 (revolve, cut)
    with BuildSketch(Plane(origin=(-71, -27.5, 5), x_dir=(0.7071067812, 0.7071067812, 0), z_dir=(-0.7071067812, 0.7071067812, 0))):
        with BuildLine():
            ThreePointArc((0, -5), (5, 0), (0, 5))
            Line((0, 5), (0, -5))
        make_face()
    revolve(axis=Axis((-71, -27.5, 5), (0, 0, -1)), mode=Mode.SUBTRACT)


with BuildPart() as f1_1:
    add(f1.part)

    # F15_t9: cut F15_tool10
    add(f15_tool10.part, mode=Mode.SUBTRACT)


with BuildPart() as f15_tool16:
    # F15_s17 → F15_t18 (new body)
    with BuildSketch(Plane.XY.offset(5)):
        with Locations((-73.5, 30)):
            Rectangle(F15_S17_W, F15_S17_H)
    extrude(amount=-F15_T18_DEPTH)

    # F15_s19 → F15_t20 (revolve, cut)
    with BuildSketch(Plane(origin=(-71, 27.5, 5), x_dir=(0.7071067812, -0.7071067812, 0), z_dir=(0.7071067812, 0.7071067812, 0))):
        with BuildLine():
            ThreePointArc((0, -5), (5, 0), (0, 5))
            Line((0, 5), (0, -5))
        make_face()
    revolve(axis=Axis((-71, 27.5, 5), (0, 0, -1)), mode=Mode.SUBTRACT)


with BuildPart() as f1_2:
    add(f1_1.part)

    # F15_t15: cut F15_tool16
    add(f15_tool16.part, mode=Mode.SUBTRACT)

    # F16 (on face) → F17 (cut)
    with BuildSketch(Plane.YZ.offset(80)):
        with Locations((-31.1217215657, 21.25)):
            Rectangle(F16_W, F16_H)
        with Locations((0, 21.25)):
            Rectangle(F16_W_2, F16_H)
        with Locations((32.5227287412, 21.25)):
            Rectangle(F16_W_3, F16_H)
    extrude(amount=-F17_DEPTH, mode=Mode.SUBTRACT)

    # F18
    f18_edges = [f1_2.edges().sort_by_distance(p)[0] for p in [
        (74, -32.5, 21.25),
        (74, 32.5, 21.25),
        (80, 0, 28),
        (80, 0, 14.5),
    ]]
    fillet(f18_edges, radius=F18_R)

    # F19 (on face) → F20 (cut)
    with BuildSketch(Plane(origin=(-76, 0, 0), x_dir=(0, -1, 0), z_dir=(-1, 0, 0))):
        with Locations((9.5, 47)):
            Rectangle(F19_W, F19_H)
    extrude(amount=-F20_DEPTH, mode=Mode.SUBTRACT)


solid = f1_2.part
